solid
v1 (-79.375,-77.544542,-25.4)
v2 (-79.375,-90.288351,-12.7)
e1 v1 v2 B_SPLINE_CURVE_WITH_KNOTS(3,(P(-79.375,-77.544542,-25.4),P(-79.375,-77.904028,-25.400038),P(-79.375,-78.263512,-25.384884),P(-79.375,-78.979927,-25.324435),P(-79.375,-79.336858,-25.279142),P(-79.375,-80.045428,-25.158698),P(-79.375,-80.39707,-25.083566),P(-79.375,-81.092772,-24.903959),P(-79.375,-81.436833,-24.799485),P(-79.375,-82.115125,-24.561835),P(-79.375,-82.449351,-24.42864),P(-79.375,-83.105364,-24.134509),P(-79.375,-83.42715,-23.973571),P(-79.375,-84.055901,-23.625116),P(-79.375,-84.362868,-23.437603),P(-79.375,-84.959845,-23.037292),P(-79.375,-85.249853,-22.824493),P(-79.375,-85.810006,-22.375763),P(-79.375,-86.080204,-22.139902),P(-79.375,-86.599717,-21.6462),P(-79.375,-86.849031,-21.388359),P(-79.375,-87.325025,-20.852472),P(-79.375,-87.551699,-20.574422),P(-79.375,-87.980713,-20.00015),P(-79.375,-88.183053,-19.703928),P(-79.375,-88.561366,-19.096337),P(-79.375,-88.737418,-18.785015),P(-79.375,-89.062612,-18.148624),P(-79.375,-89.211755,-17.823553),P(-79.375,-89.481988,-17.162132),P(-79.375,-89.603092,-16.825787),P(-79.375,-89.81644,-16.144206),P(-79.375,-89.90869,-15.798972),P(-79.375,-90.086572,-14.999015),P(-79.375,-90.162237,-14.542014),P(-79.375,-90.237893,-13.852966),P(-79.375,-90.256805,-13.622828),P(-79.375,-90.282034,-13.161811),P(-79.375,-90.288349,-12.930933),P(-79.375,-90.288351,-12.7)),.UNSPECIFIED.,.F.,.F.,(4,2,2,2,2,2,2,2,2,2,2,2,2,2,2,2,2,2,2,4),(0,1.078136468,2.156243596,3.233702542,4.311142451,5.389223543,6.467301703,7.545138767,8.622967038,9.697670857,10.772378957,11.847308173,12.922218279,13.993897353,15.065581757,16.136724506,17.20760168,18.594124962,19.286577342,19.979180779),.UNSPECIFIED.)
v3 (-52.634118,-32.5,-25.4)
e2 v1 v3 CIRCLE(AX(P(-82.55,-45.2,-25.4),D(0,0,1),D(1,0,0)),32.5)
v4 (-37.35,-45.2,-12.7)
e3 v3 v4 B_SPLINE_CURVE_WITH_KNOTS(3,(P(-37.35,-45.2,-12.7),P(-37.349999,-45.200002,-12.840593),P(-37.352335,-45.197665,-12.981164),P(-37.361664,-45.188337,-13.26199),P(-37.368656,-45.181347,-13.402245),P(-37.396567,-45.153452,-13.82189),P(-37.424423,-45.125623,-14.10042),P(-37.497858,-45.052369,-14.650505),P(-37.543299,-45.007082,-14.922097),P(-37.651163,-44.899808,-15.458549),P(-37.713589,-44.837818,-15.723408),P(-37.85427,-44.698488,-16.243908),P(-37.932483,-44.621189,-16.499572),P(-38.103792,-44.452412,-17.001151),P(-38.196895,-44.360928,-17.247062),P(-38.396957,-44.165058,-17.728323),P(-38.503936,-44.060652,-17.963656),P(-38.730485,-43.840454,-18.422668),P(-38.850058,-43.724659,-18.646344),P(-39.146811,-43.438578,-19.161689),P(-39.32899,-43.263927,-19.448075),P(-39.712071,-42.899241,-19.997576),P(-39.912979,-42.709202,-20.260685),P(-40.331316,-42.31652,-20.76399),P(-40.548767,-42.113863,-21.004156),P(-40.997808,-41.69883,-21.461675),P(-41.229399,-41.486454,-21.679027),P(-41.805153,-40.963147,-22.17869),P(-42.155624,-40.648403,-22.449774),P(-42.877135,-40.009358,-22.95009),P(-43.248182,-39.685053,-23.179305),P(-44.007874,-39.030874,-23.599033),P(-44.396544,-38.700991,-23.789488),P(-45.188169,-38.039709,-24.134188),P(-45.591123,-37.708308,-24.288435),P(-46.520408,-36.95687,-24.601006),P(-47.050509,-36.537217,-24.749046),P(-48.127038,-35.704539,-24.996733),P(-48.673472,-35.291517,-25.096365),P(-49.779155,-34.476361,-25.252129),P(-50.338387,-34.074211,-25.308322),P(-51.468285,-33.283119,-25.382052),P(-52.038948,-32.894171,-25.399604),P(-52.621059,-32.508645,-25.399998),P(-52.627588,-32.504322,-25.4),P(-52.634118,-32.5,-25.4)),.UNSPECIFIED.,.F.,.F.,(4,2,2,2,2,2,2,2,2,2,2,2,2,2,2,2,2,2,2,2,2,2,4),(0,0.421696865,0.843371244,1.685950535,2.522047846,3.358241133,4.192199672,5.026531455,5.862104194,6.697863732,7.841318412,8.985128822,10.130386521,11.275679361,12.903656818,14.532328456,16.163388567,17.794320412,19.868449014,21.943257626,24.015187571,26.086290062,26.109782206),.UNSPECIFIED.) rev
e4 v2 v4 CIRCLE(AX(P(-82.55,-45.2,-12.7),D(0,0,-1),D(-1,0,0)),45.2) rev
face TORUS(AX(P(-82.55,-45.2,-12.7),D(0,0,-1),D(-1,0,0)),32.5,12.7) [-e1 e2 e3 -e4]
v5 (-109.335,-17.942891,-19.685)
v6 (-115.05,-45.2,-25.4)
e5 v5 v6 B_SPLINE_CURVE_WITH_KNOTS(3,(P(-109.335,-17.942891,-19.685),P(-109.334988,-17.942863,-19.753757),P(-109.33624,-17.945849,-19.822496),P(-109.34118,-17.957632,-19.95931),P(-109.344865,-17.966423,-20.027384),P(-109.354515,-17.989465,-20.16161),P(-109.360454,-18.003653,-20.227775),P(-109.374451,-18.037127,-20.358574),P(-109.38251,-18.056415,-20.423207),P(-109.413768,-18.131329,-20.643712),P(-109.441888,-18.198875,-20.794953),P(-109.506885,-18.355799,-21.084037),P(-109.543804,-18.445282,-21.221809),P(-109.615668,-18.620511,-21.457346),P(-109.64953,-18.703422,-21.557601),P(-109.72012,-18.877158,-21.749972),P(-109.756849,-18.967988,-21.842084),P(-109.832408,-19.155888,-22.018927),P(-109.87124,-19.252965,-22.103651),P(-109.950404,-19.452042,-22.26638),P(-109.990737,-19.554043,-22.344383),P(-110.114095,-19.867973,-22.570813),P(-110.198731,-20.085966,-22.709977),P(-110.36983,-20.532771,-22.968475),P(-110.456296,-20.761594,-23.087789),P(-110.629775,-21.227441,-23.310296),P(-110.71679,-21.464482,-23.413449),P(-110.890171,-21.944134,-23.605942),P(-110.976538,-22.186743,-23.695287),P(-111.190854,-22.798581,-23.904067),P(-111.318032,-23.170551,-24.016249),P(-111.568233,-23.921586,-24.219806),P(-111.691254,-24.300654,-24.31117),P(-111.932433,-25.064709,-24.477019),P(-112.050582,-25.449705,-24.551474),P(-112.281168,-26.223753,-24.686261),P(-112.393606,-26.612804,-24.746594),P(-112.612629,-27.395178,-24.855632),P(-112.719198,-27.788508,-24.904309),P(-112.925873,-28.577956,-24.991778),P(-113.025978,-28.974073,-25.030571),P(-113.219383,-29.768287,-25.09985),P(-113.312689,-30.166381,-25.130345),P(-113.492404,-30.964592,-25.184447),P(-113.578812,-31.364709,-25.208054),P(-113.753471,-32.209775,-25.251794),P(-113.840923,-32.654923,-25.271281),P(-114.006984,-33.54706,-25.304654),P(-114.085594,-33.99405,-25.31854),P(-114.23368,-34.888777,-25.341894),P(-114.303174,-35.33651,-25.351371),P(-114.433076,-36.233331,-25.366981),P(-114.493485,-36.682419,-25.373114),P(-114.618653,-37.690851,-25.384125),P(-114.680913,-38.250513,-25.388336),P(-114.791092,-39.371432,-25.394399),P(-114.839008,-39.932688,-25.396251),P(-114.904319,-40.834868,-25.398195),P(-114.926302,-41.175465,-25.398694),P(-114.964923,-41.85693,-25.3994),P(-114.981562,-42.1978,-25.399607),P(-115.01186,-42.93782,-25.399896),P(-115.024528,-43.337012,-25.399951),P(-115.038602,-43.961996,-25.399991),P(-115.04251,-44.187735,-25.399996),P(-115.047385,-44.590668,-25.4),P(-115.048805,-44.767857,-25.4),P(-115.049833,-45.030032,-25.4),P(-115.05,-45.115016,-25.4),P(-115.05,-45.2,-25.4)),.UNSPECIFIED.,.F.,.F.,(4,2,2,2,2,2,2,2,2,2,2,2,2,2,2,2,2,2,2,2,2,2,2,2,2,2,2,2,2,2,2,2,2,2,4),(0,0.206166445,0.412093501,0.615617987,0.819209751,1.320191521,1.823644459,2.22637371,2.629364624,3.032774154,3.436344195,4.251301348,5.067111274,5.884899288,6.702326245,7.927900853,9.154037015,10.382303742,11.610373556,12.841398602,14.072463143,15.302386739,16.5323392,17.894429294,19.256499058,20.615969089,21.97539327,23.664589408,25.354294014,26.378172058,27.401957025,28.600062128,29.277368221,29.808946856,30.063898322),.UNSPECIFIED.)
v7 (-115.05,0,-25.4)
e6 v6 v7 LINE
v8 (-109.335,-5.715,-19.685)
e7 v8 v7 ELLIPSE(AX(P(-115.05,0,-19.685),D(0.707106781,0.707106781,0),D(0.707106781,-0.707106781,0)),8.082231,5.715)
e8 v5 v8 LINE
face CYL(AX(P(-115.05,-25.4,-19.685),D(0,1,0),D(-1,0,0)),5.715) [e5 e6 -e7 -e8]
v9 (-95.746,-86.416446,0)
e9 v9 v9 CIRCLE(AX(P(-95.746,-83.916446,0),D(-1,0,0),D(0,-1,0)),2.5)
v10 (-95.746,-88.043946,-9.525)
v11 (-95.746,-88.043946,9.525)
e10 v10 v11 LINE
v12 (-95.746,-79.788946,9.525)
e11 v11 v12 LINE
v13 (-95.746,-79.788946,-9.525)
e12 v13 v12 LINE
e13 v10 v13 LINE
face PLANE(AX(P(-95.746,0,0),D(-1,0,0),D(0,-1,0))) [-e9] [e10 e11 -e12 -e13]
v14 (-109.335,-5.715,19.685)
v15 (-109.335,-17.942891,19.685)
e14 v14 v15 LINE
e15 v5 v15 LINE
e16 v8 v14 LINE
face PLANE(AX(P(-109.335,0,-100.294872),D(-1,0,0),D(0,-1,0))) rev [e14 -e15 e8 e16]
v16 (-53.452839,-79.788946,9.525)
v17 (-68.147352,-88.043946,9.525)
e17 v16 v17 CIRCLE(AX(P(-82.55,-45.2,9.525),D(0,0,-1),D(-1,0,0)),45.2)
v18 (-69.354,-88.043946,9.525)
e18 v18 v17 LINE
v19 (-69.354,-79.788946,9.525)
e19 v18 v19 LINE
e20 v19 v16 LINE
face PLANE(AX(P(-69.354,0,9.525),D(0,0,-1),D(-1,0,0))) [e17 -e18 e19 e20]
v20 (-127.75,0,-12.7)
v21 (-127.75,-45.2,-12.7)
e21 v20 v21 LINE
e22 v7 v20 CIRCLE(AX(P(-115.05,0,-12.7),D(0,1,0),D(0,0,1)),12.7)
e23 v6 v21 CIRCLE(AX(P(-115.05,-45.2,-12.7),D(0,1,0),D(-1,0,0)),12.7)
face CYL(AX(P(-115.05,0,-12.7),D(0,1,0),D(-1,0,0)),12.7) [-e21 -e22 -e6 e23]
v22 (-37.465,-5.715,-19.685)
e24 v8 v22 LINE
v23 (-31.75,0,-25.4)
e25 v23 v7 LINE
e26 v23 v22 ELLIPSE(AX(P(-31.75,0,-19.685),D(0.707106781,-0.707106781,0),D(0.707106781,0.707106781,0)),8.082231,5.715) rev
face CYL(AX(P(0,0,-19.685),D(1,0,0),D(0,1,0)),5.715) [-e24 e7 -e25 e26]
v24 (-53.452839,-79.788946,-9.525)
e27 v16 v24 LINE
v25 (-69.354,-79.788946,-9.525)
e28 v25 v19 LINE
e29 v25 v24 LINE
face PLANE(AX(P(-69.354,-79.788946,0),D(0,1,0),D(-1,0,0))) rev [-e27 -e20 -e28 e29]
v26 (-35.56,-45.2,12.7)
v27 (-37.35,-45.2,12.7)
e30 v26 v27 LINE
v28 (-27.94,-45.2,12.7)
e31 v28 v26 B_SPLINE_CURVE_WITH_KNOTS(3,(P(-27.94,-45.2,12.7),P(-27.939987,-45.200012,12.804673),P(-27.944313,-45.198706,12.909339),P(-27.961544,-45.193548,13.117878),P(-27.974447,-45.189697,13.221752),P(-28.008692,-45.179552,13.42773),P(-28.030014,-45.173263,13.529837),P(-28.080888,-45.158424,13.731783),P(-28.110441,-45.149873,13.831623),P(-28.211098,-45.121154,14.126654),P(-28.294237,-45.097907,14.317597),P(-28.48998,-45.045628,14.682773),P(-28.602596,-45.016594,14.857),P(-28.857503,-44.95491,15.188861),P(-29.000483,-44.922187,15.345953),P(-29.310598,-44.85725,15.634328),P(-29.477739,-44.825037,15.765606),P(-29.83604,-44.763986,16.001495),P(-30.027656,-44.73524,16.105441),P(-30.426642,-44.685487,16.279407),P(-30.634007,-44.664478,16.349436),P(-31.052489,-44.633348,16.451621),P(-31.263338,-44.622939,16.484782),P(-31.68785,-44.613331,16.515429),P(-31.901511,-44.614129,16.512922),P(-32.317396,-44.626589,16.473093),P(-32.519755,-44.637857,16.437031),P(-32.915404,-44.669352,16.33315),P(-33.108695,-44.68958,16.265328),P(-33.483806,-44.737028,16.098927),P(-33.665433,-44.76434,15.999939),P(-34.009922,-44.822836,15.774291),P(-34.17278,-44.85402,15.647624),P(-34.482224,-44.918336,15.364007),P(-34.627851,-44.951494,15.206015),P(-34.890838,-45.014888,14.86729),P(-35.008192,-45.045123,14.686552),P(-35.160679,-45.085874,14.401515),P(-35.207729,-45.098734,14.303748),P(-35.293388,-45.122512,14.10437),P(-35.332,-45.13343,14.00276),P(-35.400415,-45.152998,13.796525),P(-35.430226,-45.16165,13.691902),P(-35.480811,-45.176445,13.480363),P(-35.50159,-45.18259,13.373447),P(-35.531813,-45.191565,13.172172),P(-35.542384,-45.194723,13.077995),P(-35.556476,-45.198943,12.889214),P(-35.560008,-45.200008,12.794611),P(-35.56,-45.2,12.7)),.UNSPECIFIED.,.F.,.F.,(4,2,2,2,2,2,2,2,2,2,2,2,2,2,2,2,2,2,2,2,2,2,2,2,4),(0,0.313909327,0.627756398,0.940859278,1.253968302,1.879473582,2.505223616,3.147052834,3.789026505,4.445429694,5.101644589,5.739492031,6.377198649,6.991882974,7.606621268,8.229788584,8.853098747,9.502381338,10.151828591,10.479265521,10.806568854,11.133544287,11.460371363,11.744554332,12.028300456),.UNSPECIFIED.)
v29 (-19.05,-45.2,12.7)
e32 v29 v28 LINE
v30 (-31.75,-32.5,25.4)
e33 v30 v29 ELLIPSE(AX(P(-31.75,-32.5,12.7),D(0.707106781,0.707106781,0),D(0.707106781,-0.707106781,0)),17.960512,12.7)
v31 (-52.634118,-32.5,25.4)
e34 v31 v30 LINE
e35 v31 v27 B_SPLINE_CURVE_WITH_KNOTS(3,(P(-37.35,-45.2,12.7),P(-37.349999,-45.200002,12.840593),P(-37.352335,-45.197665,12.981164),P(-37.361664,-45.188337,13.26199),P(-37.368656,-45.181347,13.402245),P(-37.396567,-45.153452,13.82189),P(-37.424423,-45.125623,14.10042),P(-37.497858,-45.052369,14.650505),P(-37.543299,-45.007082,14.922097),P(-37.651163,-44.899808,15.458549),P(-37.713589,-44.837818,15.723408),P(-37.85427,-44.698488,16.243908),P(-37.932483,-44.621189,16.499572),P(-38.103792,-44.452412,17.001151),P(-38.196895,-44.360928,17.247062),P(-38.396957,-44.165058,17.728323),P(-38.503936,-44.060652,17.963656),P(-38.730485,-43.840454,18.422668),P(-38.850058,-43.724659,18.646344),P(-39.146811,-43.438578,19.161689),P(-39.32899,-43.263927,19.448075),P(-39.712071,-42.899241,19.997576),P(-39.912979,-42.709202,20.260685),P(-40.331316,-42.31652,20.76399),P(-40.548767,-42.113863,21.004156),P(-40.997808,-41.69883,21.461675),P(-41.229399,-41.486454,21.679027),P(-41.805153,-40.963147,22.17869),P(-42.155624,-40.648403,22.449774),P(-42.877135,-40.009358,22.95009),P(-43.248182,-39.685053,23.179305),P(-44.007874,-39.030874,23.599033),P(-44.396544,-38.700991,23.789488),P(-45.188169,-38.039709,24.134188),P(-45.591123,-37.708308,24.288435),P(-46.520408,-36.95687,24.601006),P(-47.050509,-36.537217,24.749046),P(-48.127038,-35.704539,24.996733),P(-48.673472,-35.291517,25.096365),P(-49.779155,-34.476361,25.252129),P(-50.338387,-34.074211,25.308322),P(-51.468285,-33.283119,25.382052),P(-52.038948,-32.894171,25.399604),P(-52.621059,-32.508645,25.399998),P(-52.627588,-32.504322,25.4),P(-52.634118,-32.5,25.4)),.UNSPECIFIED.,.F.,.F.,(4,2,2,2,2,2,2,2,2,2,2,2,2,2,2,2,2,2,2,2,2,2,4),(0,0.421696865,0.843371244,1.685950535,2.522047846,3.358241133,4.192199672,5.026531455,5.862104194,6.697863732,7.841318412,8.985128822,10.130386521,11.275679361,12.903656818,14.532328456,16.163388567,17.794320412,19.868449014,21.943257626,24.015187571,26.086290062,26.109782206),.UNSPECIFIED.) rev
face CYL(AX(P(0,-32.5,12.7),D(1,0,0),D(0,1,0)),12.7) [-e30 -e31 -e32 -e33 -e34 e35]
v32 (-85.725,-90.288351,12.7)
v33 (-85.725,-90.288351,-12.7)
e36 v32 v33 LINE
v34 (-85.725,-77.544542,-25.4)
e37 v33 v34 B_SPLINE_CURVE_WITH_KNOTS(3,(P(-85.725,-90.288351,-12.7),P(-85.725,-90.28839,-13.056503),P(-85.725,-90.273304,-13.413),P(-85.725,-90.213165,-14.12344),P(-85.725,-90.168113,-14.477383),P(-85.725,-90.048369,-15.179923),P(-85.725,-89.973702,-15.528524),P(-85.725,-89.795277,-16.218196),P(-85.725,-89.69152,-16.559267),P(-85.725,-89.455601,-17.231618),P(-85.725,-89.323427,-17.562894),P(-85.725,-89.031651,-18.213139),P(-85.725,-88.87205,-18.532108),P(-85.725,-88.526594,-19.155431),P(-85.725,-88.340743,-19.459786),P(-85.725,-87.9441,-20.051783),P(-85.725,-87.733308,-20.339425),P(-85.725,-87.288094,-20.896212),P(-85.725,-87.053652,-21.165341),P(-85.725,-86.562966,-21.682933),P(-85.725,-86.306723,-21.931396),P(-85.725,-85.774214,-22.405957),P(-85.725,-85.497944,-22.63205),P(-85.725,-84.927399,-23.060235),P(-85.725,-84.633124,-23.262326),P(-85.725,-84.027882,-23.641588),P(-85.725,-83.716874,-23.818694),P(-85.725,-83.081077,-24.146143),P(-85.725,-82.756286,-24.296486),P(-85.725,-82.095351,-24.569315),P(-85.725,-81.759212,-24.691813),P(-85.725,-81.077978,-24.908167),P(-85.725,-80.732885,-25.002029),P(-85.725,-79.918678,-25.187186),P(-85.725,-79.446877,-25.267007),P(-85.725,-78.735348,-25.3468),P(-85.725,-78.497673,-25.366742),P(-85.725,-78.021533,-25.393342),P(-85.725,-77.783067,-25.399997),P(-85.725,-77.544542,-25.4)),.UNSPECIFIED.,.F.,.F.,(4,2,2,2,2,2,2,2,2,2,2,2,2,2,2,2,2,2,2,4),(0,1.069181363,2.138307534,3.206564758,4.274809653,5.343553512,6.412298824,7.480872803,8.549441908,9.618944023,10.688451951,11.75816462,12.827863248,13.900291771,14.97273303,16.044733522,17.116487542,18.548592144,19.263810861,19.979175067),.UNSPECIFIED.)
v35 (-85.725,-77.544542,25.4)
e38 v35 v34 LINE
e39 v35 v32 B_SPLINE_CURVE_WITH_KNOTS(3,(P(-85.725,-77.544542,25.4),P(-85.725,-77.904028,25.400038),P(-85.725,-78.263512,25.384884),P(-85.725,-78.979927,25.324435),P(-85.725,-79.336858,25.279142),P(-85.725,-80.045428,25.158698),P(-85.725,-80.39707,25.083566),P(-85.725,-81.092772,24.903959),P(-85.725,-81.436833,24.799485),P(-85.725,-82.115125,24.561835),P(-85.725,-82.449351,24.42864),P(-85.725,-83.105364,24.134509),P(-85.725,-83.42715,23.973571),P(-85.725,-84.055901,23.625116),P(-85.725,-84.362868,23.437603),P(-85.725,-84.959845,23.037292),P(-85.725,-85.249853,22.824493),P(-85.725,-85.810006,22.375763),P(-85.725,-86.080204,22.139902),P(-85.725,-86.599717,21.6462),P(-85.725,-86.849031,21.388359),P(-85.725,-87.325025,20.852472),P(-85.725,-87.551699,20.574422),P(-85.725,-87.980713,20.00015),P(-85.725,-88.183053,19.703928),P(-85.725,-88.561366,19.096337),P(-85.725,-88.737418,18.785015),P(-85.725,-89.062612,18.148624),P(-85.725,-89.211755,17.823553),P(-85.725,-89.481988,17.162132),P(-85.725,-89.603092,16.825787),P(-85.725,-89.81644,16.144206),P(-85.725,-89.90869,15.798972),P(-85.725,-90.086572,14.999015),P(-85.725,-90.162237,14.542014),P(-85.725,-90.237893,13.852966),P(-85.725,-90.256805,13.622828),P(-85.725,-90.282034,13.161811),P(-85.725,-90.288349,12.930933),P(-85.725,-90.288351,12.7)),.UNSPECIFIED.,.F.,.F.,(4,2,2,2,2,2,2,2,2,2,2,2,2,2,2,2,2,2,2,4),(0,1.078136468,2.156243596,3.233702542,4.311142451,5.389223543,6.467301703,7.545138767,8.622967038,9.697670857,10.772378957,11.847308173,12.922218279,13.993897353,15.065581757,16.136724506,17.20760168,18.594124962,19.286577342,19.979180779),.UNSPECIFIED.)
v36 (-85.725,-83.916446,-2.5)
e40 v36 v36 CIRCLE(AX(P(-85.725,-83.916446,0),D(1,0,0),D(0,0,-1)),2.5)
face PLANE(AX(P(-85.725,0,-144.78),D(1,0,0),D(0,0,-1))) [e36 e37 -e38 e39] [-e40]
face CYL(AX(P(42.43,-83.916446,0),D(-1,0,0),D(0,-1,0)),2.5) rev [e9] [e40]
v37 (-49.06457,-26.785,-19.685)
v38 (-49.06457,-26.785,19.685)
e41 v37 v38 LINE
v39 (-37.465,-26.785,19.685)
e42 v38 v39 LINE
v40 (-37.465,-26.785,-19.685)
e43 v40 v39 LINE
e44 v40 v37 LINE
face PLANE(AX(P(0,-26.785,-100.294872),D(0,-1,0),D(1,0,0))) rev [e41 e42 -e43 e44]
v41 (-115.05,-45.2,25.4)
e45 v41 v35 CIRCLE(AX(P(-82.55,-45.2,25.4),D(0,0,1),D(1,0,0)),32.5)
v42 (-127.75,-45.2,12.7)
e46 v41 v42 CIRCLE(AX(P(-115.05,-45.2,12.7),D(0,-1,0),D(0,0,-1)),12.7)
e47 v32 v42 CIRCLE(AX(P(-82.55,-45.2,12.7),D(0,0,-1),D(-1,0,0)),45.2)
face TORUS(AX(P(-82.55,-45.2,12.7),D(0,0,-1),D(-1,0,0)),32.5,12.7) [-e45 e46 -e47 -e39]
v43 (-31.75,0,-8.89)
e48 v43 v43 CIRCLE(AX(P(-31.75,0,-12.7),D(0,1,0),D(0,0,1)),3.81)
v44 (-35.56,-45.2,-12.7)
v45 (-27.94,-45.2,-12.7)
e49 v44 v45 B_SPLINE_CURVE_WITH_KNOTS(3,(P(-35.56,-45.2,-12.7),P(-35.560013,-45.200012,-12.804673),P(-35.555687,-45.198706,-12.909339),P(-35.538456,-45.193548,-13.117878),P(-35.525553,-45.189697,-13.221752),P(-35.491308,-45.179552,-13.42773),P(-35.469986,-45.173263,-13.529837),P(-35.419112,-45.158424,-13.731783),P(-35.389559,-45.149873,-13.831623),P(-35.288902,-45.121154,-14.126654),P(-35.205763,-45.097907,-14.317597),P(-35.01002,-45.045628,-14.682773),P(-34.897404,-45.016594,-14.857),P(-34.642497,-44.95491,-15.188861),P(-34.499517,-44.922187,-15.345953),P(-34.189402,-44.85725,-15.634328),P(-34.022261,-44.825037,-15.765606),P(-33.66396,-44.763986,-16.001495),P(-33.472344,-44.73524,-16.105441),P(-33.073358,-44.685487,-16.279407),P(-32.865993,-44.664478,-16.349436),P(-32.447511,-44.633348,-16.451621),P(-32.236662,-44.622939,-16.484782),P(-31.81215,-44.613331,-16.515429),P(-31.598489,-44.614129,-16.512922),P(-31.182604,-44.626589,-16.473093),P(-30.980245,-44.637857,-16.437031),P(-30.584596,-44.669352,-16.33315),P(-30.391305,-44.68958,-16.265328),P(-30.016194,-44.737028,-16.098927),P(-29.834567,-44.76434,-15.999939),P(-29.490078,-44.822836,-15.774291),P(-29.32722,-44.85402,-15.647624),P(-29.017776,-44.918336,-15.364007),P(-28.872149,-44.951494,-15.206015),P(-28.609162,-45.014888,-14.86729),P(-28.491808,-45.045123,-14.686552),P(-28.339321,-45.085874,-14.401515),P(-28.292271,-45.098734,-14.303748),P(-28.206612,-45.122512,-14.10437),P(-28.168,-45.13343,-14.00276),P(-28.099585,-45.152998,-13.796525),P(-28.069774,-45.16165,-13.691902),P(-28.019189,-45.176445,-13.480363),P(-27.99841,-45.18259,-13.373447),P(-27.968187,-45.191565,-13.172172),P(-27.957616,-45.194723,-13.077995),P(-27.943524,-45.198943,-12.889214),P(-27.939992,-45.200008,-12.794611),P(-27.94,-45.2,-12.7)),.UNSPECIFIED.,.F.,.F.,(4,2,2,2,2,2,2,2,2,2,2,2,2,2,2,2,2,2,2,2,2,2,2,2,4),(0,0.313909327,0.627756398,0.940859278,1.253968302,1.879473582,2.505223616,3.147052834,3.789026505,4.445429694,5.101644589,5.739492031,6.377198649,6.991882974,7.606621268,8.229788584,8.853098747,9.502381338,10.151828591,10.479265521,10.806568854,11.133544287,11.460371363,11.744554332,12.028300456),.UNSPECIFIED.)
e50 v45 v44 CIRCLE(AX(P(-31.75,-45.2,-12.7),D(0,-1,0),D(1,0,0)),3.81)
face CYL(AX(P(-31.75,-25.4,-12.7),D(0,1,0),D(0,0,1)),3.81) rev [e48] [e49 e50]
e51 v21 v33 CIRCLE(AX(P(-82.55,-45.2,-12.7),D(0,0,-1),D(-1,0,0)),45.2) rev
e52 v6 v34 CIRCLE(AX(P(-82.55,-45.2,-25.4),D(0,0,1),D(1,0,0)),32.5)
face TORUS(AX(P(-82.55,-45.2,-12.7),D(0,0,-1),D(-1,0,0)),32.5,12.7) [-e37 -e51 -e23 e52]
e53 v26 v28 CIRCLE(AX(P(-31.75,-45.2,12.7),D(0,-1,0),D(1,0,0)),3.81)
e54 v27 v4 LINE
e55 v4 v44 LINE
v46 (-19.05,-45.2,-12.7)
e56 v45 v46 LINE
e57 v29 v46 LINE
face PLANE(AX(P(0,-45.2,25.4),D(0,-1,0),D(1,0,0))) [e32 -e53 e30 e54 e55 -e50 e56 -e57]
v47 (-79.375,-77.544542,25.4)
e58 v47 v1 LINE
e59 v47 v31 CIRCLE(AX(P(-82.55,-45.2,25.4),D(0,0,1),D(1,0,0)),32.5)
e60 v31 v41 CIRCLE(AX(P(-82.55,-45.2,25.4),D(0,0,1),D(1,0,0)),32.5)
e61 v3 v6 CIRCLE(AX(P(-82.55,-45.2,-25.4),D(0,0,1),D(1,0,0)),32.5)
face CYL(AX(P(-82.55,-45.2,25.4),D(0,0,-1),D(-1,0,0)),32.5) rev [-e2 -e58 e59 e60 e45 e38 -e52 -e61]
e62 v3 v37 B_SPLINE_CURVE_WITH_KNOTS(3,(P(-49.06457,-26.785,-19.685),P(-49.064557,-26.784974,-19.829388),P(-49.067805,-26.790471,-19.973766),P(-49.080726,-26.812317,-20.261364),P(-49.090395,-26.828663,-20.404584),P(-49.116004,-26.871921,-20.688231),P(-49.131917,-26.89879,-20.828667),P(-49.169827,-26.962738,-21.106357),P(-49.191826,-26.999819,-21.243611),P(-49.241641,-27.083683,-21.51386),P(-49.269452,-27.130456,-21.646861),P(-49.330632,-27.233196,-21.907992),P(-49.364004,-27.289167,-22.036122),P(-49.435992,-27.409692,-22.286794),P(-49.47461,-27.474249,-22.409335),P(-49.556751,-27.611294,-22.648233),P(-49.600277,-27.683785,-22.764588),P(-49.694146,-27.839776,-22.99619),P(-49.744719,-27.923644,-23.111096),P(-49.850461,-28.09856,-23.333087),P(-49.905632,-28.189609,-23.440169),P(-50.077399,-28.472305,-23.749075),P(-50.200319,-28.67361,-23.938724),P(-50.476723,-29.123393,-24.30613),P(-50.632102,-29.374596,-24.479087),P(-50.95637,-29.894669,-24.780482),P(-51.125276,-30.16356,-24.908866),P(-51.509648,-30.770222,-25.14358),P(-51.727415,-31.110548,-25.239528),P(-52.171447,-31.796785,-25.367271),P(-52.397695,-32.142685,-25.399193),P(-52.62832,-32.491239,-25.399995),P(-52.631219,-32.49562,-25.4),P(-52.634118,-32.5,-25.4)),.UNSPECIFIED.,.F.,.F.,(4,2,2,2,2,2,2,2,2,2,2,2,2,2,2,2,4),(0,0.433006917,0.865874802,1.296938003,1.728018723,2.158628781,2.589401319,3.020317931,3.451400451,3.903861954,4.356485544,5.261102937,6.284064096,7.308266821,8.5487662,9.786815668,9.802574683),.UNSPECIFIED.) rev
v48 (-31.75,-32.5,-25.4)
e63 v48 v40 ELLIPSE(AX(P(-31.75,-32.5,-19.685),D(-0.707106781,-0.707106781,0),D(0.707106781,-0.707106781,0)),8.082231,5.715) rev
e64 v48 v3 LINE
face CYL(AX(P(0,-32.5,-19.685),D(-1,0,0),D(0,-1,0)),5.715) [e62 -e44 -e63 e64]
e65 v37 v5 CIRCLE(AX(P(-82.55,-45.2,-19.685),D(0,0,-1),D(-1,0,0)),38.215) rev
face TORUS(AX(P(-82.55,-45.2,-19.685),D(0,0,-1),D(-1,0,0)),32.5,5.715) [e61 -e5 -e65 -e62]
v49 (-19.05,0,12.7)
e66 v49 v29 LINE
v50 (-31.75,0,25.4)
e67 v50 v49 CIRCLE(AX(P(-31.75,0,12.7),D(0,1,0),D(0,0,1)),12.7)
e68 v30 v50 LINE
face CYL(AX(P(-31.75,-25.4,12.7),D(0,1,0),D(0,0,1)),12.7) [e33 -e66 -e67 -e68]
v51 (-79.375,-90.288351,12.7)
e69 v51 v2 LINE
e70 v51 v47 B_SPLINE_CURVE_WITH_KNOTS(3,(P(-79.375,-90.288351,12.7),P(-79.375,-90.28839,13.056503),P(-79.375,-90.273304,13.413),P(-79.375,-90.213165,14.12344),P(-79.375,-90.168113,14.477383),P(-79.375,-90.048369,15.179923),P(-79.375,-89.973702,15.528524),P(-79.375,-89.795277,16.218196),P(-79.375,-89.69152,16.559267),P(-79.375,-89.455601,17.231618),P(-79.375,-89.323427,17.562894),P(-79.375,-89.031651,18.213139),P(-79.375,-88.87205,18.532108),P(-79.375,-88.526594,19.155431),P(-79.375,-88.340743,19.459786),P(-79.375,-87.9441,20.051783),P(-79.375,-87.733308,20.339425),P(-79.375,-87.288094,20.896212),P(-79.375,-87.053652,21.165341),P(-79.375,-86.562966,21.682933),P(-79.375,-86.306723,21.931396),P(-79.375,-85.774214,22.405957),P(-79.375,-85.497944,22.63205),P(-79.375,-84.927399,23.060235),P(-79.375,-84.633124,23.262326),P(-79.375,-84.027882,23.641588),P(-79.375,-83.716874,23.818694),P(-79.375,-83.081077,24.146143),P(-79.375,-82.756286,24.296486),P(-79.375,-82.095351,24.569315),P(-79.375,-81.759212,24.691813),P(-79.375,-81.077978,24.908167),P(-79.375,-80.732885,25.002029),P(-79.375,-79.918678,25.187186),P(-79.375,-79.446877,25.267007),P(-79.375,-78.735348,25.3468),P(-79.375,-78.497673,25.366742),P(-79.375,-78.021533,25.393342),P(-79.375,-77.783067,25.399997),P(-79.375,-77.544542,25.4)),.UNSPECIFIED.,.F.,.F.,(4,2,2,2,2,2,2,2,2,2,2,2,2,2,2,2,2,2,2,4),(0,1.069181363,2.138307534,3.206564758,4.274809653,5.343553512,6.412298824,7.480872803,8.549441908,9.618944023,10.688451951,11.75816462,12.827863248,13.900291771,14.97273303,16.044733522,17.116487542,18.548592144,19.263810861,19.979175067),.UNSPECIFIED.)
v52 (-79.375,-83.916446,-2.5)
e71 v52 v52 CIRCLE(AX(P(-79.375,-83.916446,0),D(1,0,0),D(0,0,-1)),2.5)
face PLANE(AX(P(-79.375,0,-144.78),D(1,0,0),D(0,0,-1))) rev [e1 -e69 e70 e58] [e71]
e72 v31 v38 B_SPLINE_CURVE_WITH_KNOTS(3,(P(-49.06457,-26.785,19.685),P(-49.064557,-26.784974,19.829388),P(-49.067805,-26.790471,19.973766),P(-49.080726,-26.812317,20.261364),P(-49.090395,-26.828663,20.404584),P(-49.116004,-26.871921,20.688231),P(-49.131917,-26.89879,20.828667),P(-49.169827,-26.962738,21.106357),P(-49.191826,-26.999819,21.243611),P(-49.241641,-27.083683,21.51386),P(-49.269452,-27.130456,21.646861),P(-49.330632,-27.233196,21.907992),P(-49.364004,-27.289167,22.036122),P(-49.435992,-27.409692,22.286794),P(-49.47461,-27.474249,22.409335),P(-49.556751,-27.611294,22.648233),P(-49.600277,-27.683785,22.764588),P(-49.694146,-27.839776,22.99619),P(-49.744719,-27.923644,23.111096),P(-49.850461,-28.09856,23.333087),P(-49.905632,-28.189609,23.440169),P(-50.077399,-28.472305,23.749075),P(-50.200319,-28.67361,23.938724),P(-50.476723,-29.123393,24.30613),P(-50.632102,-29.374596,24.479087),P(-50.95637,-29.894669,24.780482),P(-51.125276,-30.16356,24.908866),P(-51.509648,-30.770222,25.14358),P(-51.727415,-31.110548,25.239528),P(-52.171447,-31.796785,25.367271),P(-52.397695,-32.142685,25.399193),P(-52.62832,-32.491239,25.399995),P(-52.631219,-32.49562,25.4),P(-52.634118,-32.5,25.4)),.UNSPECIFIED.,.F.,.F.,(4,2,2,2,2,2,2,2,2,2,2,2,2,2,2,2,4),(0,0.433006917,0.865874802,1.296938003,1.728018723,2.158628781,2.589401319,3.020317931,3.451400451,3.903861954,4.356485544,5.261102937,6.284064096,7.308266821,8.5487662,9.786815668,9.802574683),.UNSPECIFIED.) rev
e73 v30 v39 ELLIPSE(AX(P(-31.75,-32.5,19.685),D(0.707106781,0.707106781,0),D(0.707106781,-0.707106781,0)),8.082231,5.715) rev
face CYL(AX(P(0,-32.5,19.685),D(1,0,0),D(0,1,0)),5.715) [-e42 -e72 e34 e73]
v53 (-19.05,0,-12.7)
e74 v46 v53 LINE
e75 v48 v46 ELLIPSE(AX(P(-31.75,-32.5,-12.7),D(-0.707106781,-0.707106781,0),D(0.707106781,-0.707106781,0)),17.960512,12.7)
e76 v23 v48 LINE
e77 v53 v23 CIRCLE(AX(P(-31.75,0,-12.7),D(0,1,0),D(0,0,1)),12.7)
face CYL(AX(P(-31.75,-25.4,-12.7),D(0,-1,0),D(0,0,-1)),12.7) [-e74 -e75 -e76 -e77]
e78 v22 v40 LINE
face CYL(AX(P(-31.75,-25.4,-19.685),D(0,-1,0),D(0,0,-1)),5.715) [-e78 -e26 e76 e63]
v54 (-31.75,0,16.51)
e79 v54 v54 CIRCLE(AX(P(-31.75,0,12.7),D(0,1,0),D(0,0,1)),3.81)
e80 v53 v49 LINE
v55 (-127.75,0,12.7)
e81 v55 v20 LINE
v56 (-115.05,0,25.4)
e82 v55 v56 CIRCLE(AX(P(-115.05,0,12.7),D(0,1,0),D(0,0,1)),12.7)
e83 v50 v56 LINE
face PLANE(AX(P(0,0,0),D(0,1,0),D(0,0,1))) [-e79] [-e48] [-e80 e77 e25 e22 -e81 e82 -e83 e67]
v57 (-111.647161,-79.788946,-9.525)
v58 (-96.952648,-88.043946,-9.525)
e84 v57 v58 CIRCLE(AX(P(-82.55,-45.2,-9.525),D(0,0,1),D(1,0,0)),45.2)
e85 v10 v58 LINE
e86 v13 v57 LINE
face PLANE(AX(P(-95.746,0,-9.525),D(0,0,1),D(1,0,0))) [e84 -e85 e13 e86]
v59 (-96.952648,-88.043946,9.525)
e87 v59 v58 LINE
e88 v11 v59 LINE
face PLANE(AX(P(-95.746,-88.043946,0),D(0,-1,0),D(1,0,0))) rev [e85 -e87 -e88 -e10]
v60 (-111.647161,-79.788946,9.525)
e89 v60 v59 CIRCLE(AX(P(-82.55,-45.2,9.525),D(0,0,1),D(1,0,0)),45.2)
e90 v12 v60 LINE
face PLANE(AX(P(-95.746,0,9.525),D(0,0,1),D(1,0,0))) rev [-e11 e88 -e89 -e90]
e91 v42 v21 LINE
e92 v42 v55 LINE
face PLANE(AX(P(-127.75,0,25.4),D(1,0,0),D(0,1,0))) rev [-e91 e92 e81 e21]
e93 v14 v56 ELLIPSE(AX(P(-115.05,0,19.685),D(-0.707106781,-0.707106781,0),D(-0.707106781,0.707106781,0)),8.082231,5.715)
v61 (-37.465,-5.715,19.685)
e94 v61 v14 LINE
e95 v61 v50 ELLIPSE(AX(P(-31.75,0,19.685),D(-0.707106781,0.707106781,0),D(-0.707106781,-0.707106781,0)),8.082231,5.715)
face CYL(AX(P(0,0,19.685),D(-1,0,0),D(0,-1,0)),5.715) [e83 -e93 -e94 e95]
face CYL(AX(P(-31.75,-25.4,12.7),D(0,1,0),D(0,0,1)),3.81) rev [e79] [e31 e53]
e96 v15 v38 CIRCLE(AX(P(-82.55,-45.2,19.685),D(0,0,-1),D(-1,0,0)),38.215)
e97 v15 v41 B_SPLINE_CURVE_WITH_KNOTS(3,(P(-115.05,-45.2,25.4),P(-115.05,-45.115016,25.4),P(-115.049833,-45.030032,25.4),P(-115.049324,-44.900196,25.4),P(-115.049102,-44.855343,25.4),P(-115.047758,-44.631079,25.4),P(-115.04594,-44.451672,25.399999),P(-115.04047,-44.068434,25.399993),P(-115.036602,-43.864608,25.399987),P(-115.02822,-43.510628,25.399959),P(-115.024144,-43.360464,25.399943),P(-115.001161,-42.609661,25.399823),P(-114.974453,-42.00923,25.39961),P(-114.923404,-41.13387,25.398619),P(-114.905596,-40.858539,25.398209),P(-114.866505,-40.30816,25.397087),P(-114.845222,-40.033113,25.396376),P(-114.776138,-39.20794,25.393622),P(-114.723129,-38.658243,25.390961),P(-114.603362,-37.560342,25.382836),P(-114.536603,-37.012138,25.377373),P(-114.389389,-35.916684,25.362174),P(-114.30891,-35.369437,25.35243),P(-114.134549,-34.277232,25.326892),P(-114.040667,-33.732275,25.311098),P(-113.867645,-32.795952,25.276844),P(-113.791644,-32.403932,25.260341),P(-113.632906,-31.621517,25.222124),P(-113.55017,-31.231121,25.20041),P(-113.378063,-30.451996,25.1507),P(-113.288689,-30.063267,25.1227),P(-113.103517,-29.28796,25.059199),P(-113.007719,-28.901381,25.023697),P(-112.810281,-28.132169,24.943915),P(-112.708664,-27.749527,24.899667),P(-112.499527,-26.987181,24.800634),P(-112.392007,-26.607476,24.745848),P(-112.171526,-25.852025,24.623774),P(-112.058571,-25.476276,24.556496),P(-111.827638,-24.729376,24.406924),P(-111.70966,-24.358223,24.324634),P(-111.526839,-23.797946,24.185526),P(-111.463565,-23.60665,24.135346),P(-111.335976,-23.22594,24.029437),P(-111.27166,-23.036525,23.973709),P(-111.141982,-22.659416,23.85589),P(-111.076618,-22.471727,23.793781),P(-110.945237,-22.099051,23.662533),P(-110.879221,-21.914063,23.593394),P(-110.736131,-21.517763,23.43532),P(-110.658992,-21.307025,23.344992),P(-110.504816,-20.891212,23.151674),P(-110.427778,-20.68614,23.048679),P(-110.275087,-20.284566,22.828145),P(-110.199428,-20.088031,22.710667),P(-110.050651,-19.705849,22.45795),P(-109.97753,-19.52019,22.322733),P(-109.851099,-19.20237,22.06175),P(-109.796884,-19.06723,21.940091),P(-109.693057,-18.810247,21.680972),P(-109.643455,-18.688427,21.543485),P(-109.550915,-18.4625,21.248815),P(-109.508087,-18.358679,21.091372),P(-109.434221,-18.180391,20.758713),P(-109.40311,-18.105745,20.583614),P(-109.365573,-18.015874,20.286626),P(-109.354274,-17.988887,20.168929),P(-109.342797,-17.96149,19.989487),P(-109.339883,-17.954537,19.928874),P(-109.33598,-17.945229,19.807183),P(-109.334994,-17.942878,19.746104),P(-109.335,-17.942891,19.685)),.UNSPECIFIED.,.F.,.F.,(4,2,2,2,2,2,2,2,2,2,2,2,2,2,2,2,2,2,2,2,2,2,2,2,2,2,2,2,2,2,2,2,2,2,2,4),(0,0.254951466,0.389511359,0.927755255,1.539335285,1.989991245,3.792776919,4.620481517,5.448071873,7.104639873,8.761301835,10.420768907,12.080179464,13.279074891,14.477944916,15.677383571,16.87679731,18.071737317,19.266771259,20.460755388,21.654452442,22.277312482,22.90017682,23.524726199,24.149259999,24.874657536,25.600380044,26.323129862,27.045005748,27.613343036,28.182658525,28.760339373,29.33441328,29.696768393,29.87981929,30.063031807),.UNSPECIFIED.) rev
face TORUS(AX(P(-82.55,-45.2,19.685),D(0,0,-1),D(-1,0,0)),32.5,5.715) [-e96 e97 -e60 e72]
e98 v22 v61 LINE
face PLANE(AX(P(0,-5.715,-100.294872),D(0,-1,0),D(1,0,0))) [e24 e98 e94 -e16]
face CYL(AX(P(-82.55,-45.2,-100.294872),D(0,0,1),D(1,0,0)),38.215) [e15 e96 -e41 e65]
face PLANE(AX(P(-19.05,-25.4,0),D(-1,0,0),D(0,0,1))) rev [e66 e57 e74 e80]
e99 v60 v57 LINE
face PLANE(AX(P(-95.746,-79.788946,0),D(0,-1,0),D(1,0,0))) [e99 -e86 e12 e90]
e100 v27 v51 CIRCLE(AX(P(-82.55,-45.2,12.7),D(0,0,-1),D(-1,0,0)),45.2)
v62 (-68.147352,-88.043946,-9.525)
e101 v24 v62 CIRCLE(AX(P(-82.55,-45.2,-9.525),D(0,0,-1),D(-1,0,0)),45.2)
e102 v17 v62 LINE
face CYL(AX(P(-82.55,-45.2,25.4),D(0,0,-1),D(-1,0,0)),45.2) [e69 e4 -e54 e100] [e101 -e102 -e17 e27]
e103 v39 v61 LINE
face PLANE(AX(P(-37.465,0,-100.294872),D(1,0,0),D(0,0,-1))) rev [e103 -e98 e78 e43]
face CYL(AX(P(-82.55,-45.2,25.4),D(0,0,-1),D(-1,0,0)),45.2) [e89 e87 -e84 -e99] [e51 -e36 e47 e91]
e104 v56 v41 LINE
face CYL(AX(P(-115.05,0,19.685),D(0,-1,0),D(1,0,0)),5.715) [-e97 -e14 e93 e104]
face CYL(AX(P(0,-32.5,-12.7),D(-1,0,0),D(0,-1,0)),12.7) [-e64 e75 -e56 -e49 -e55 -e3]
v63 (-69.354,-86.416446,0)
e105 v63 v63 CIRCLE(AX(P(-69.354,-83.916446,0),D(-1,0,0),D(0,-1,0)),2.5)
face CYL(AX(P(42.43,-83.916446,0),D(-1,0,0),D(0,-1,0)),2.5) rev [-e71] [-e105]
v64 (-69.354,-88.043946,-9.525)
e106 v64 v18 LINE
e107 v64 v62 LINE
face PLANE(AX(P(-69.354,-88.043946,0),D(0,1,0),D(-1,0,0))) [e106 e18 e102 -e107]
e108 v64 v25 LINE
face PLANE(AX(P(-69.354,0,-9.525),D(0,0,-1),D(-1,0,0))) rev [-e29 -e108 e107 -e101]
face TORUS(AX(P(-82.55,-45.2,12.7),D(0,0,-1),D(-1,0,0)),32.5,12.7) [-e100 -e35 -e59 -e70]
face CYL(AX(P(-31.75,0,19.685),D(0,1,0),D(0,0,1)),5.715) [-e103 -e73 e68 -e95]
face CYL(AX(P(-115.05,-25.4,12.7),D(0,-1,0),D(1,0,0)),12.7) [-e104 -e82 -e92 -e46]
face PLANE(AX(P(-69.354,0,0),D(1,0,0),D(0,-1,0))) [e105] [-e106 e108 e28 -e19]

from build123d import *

# Parameters (mm, degrees)
SKETCH2_W           = 25.4
SKETCH2_H           = 50.8
SKETCH2_R           = 3.81
BOSS_EXTRUDE1_DEPTH = 25.4
BOSS_EXTRUDE2_DEPTH = 25.4
CUT_EXTRUDE1_DEPTH  = 170.18
CUT_EXTRUDE2_DEPTH  = 170.18
SKETCH5_3_W         = 19.05
SKETCH5_3_H         = 8.255
SKETCH5_3_R         = 2.5
CUT_EXTRUDE3_DEPTH  = 32.004
SKETCH6_R           = 3.81
CUT_EXTRUDE4_DEPTH  = 32.004
FILLET1_R           = 12.7
CUT_EXTRUDE6_DEPTH  = 50.8
FILLET2_R           = 5.715


# Some blends are built 0.0001 mm under size
with BuildPart() as part:
    # Sketch2 → Boss-Extrude1 (new body)
    with BuildSketch(Plane(origin=(0, 0, 0), x_dir=(1, 0, 0), z_dir=(0, 1, 0))):
        with Locations((-31.75, 0)):
            Rectangle(SKETCH2_W, SKETCH2_H)
        with Locations(Location((-31.75, -12.7, 0), (0, 0, 270))):
            Circle(SKETCH2_R, mode=Mode.SUBTRACT)
        with Locations(Location((-31.75, 12.7, 0), (0, 0, 270))):
            Circle(SKETCH2_R, mode=Mode.SUBTRACT)
    extrude(amount=-BOSS_EXTRUDE1_DEPTH)

    # Sketch3 → Boss-Extrude2 (add, symmetric)
    with BuildSketch(Plane.XY):
        with BuildLine():
            Line((-44.45, -25.4), (-44.45, 0))
            Line((-44.45, 0), (-127.75, 0))
            Line((-127.75, 0), (-127.75, -45.2))
            Line((-127.75, -45.2), (-115.05, -45.2))
            ThreePointArc((-115.05, -45.2), (-82.55, -12.7), (-50.05, -45.2))
            Line((-50.05, -45.2), (-37.35, -45.2))
            Line((-37.35, -45.2), (-19.05, -45.2))
            Line((-19.05, -45.2), (-19.05, -25.4))
            Line((-19.05, -25.4), (-44.45, -25.4))
        make_face()
        with BuildLine():
            Line((-115.05, -45.2), (-127.75, -45.2))
            ThreePointArc((-127.75, -45.2), (-82.55, -90.4), (-37.35, -45.2))
            Line((-37.35, -45.2), (-50.05, -45.2))
            ThreePointArc((-50.05, -45.2), (-82.55, -77.7), (-115.05, -45.2))
        make_face()
    extrude(amount=BOSS_EXTRUDE2_DEPTH, both=True)

    # Sketch4 → Cut-Extrude1 (cut)
    with BuildSketch(Plane.XY.offset(25.4)):
        with BuildLine():
            Line((-85.725, -90.288350768), (-85.725, -104.566683373))
            Line((-85.725, -104.566683373), (-79.375, -104.566683373))
            Line((-79.375, -104.566683373), (-79.375, -90.288350768))
            ThreePointArc((-79.375, -90.288350768), (-82.55, -90.4), (-85.725, -90.288350768))
        make_face()
        with BuildLine():
            ThreePointArc((-50.05, -45.2), (-104.379595736, -21.122650686), (-85.725, -77.544541657))
            Line((-85.725, -77.544541657), (-85.725, -50.833316627))
            Line((-85.725, -50.833316627), (-79.375, -50.833316627))
            Line((-79.375, -50.833316627), (-79.375, -77.544541657))
            ThreePointArc((-79.375, -77.544541657), (-58.472650686, -67.029595736), (-50.05, -45.2))
        make_face()
        with BuildLine():
            Line((-85.725, -50.833316627), (-85.725, -77.544541657))
            ThreePointArc((-85.725, -77.544541657), (-82.55, -77.7), (-79.375, -77.544541657))
            Line((-79.375, -77.544541657), (-79.375, -50.833316627))
            Line((-79.375, -50.833316627), (-85.725, -50.833316627))
        make_face()
        with BuildLine():
            Line((-85.725, -77.544541657), (-85.725, -90.288350768))
            ThreePointArc((-85.725, -90.288350768), (-82.55, -90.4), (-79.375, -90.288350768))
            Line((-79.375, -90.288350768), (-79.375, -77.544541657))
            ThreePointArc((-79.375, -77.544541657), (-82.55, -77.7), (-85.725, -77.544541657))
        make_face()
    extrude(amount=-CUT_EXTRUDE1_DEPTH, mode=Mode.SUBTRACT)

    # Sketch5 → Cut-Extrude2 (cut)
    with BuildSketch(Plane.ZY.offset(127.75)):
        with BuildLine():
            ThreePointArc((2.5, -83.916446213), (1.767766953, -82.14867926), (0, -81.416446213))
            Line((0, -81.416446213), (0, -86.416446213))
            ThreePointArc((0, -86.416446213), (1.767766953, -85.684213166), (2.5, -83.916446213))
        make_face()
        with BuildLine():
            Line((0, -86.416446213), (0, -81.416446213))
            ThreePointArc((0, -81.416446213), (-2.5, -83.916446213), (0, -86.416446213))
        make_face()
    extrude(amount=-CUT_EXTRUDE2_DEPTH, mode=Mode.SUBTRACT)

    # Sketch5<3> → Cut-Extrude3 (cut)
    with BuildSketch(Plane.ZY.offset(127.75)):
        with Locations((0, -83.916446213)):
            Rectangle(SKETCH5_3_W, SKETCH5_3_H)
        with Locations(Location((0, -83.916446213, 0), (0, 0, 270))):
            Circle(SKETCH5_3_R, mode=Mode.SUBTRACT)
    cut_extrude3 = extrude(amount=-CUT_EXTRUDE3_DEPTH, mode=Mode.SUBTRACT)

    # Mirror1: Cut-Extrude3 across plane
    add(cut_extrude3.mirror(Plane.ZY.offset(82.55)), mode=Mode.SUBTRACT)

    # Sketch6 → Cut-Extrude4 (cut)
    with BuildSketch(Plane(origin=(0, -25.4, 0), x_dir=(1, 0, 0), z_dir=(0, 1, 0))):
        with Locations(Location((-31.75, -12.7, 0), (0, 0, 270))):
            Circle(SKETCH6_R)
        with Locations(Location((-31.75, 12.7, 0), (0, 0, 270))):
            Circle(SKETCH6_R)
    extrude(amount=-CUT_EXTRUDE4_DEPTH, mode=Mode.SUBTRACT)

    # Fillet1
    # the kernel refuses this fillet: 12.7 mm, written as the material it takes off along each edge
    with BuildSketch(Plane(origin=(-82.55, -45.2, 25.4), x_dir=(-1, 0, 0), z_dir=(0, 1, 0))) as fillet1_piece_1:
        with BuildLine():
            CenterArc((45.2 - FILLET1_R, -FILLET1_R), FILLET1_R, 360, 90)
            Line((45.2, -FILLET1_R), (45.2, 0))
            Line((45.2, 0), (45.2 - FILLET1_R, 0))
        make_face()
    revolve(axis=Axis((-82.55, -45.2, 25.4), (0, 0, 1)), revolution_arc=126.233269218, mode=Mode.SUBTRACT)
    with BuildSketch(Plane(origin=(-82.55, -45.2, -25.4), x_dir=(-1, 0, 0), z_dir=(0, 1, 0))) as fillet1_piece_2:
        with BuildLine():
            CenterArc((45.2 - FILLET1_R, FILLET1_R), FILLET1_R, 270, 90)
            Line((45.2, FILLET1_R), (45.2, 0))
            Line((45.2, 0), (45.2 - FILLET1_R, 0))
        make_face()
    revolve(axis=Axis((-82.55, -45.2, -25.4), (0, 0, 1)), revolution_arc=126.233269218, mode=Mode.SUBTRACT)
    with BuildSketch(Plane(origin=(-19.05, -76.95, 25.4), x_dir=(-1, 0, 0), z_dir=(0, 1, 0))) as fillet1_piece_3:
        with BuildLine():
            CenterArc((FILLET1_R, -FILLET1_R), FILLET1_R, 90, 90)
            Line((0, -FILLET1_R), (0, 0))
            Line((0, 0), (FILLET1_R, 0))
        make_face()
    extrude(amount=108.7, mode=Mode.SUBTRACT)
    with BuildSketch(Plane(origin=(12.7, -45.2, -25.4), x_dir=(0, 0, 1), z_dir=(-1, 0, 0))) as fillet1_piece_4_section:
        with BuildLine():
            CenterArc((FILLET1_R, FILLET1_R), FILLET1_R, 180, 90)
            Line((0, FILLET1_R), (0, 0))
            Line((0, 0), (FILLET1_R, 0))
        make_face()
    fillet1_piece_4 = extrude(amount=81.8, mode=Mode.PRIVATE)
    fillet1_piece_4 = fillet1_piece_4 - Plane(origin=(-82.55, -45.2, -25.4), x_dir=(-1, 0, 0), z_dir=(0, 0, 1)) * Cylinder(45.2, 215, mode=Mode.PRIVATE)
    add(fillet1_piece_4, mode=Mode.SUBTRACT)
    with BuildSketch(Plane(origin=(-69.1, -45.2, 25.4), x_dir=(0, 1, 0), z_dir=(1, 0, 0))) as fillet1_piece_5_section:
        with BuildLine():
            CenterArc((FILLET1_R, -FILLET1_R), FILLET1_R, 90, 90)
            Line((0, -FILLET1_R), (0, 0))
            Line((0, 0), (FILLET1_R, 0))
        make_face()
    fillet1_piece_5 = extrude(amount=81.8, mode=Mode.PRIVATE)
    fillet1_piece_5 = fillet1_piece_5 - Plane(origin=(-82.55, -45.2, 25.4), x_dir=(-1, 0, 0), z_dir=(0, 0, 1)) * Cylinder(45.2, 215, mode=Mode.PRIVATE)
    add(fillet1_piece_5, mode=Mode.SUBTRACT)
    with BuildSketch(Plane(origin=(-82.55, -45.2, 25.4), x_dir=(-0.5910741355046212, -0.8066172365734969, 0), z_dir=(-0.8066172365734969, 0.5910741355046212, 0))) as fillet1_piece_6:
        with BuildLine():
            CenterArc((45.2 - FILLET1_R, -FILLET1_R), FILLET1_R, 360, 90)
            Line((45.2, -FILLET1_R), (45.2, 0))
            Line((45.2, 0), (45.2 - FILLET1_R, 0))
        make_face()
    revolve(axis=Axis((-82.55, -45.2, 25.4), (0, 0, 1)), revolution_arc=126.233269218, mode=Mode.SUBTRACT)
    with BuildSketch(Plane(origin=(-82.55, -45.2, -25.4), x_dir=(-0.5910741355045994, -0.8066172365735128, 0), z_dir=(-0.8066172365735128, 0.5910741355045994, 0))) as fillet1_piece_7:
        with BuildLine():
            CenterArc((45.2 - FILLET1_R, FILLET1_R), FILLET1_R, 270, 90)
            Line((45.2, FILLET1_R), (45.2, 0))
            Line((45.2, 0), (45.2 - FILLET1_R, 0))
        make_face()
    revolve(axis=Axis((-82.55, -45.2, -25.4), (0, 0, 1)), revolution_arc=126.233269218, mode=Mode.SUBTRACT)
    with BuildSketch(Plane(origin=(-127.75, 31.75, -25.4), x_dir=(1, 0, 0), z_dir=(0, -1, 0))) as fillet1_piece_8:
        with BuildLine():
            CenterArc((FILLET1_R, FILLET1_R), FILLET1_R, 180, 90)
            Line((0, FILLET1_R), (0, 0))
            Line((0, 0), (FILLET1_R, 0))
        make_face()
    extrude(amount=76.95, mode=Mode.SUBTRACT)
    with BuildSketch(Plane(origin=(-127.75, 31.75, 25.4), x_dir=(1, 0, 0), z_dir=(0, -1, 0))) as fillet1_piece_9:
        with BuildLine():
            CenterArc((FILLET1_R, -FILLET1_R), FILLET1_R, 90, 90)
            Line((0, -FILLET1_R), (0, 0))
            Line((0, 0), (FILLET1_R, 0))
        make_face()
    extrude(amount=76.95, mode=Mode.SUBTRACT)
    with BuildSketch(Plane(origin=(-19.05, -76.95, -25.4), x_dir=(-1, 0, 0), z_dir=(0, 1, 0))) as fillet1_piece_10:
        with BuildLine():
            CenterArc((FILLET1_R, FILLET1_R), FILLET1_R, 180, 90)
            Line((0, FILLET1_R), (0, 0))
            Line((0, 0), (FILLET1_R, 0))
        make_face()
    extrude(amount=108.7, mode=Mode.SUBTRACT)
    with BuildSketch(Plane(origin=(-19.05, -45.2, -25.4), x_dir=(0, 0, 1), z_dir=(-1, 0, 0))) as fillet1_piece_11a_section:
        with BuildLine():
            CenterArc((FILLET1_R, FILLET1_R), FILLET1_R, 180, 90)
            Line((0, FILLET1_R), (0, 0))
            Line((0, 0), (FILLET1_R, 0))
        make_face()
    fillet1_piece_11a = extrude(amount=50.05, mode=Mode.PRIVATE)
    fillet1_piece_11a = fillet1_piece_11a & Plane(origin=(-82.55, -45.2, -25.4), x_dir=(-1, 0, 0), z_dir=(0, 0, 1)) * Cylinder(45.2, 151, mode=Mode.PRIVATE)
    fillet1_piece_11a = fillet1_piece_11a - Plane(origin=(-82.55, -45.2, -25.4), x_dir=(-1, 0, 0), z_dir=(0, 0, 1)) * Cylinder(32.5, 151, mode=Mode.PRIVATE)
    with BuildSketch(Plane(origin=(-82.55, -45.2, -25.4), x_dir=(-0.5910741355045994, -0.8066172365735128, 0), z_dir=(-0.8066172365735128, 0.5910741355045994, 0))) as fillet1_piece_11b_section:
        with BuildLine():
            CenterArc((45.2 - FILLET1_R, FILLET1_R), FILLET1_R, 270, 90)
            Line((45.2, FILLET1_R), (45.2, 0))
            Line((45.2, 0), (45.2 - FILLET1_R, 0))
        make_face()
    fillet1_piece_11b = revolve(axis=Axis((-82.55, -45.2, -25.4), (0, 0, 1)), revolution_arc=166.494503726, mode=Mode.PRIVATE)
    fillet1_piece_11b = split(fillet1_piece_11b, bisect_by=Plane(origin=(-82.55, -45.2, -25.4), z_dir=(0, 1, 0)), keep=Keep.TOP, mode=Mode.PRIVATE)
    fillet1_piece_11 = fillet1_piece_11a & fillet1_piece_11b
    add(fillet1_piece_11, mode=Mode.SUBTRACT)
    with BuildSketch(Plane(origin=(-82.55, -45.2, 25.4), x_dir=(-0.5910741355046212, -0.8066172365734969, 0), z_dir=(-0.8066172365734969, 0.5910741355046212, 0))) as fillet1_piece_12a_section:
        with BuildLine():
            CenterArc((45.2 - FILLET1_R, -FILLET1_R), FILLET1_R, 360, 90)
            Line((45.2, -FILLET1_R), (45.2, 0))
            Line((45.2, 0), (45.2 - FILLET1_R, 0))
        make_face()
    fillet1_piece_12a = revolve(axis=Axis((-82.55, -45.2, 25.4), (0, 0, 1)), revolution_arc=166.494503726, mode=Mode.PRIVATE)
    fillet1_piece_12a = split(fillet1_piece_12a, bisect_by=Plane(origin=(-82.55, -45.2, 25.4), z_dir=(0, 1, 0)), keep=Keep.TOP, mode=Mode.PRIVATE)
    with BuildSketch(Plane(origin=(-69.1, -45.2, 25.4), x_dir=(0, 1, 0), z_dir=(1, 0, 0))) as fillet1_piece_12b_section:
        with BuildLine():
            CenterArc((FILLET1_R, -FILLET1_R), FILLET1_R, 90, 90)
            Line((0, -FILLET1_R), (0, 0))
            Line((0, 0), (FILLET1_R, 0))
        make_face()
    fillet1_piece_12b = extrude(amount=50.05, mode=Mode.PRIVATE)
    fillet1_piece_12b = fillet1_piece_12b & Plane(origin=(-82.55, -45.2, 25.4), x_dir=(-1, 0, 0), z_dir=(0, 0, 1)) * Cylinder(45.2, 151, mode=Mode.PRIVATE)
    fillet1_piece_12b = fillet1_piece_12b - Plane(origin=(-82.55, -45.2, 25.4), x_dir=(-1, 0, 0), z_dir=(0, 0, 1)) * Cylinder(32.5, 151, mode=Mode.PRIVATE)
    fillet1_piece_12 = fillet1_piece_12a & fillet1_piece_12b
    add(fillet1_piece_12, mode=Mode.SUBTRACT)

    # Sketch7 → Cut-Extrude6 (cut)
    with BuildSketch(Plane.XY.offset(25.4)):
        with BuildLine():
            Line((-49.064570333, -26.785), (-37.465, -26.785))
            Line((-37.465, -26.785), (-37.465, -5.715))
            Line((-37.465, -5.715), (-109.335, -5.715))
            Line((-109.335, -5.715), (-109.335, -17.942890836))
            ThreePointArc((-109.335, -17.942890836), (-77.002959073, -7.389729412), (-49.064570333, -26.785))
        make_face()
    extrude(amount=-CUT_EXTRUDE6_DEPTH, mode=Mode.SUBTRACT)

    # Fillet2
    fillet2_edges = [part.edges().sort_by_distance(p)[0] for p in [
        (-77.002959073, -7.389729412, -25.4),
        (-73.4, -5.715, -25.4),
        (-43.264785166, -26.785, 25.4),
        (-37.465, -16.25, 25.4),
        (-109.335, -11.828945418, 25.4),
        (-43.264785166, -26.785, -25.4),
        (-37.465, -16.25, -25.4),
        (-73.4, -5.715, 25.4),
        (-109.335, -11.828945418, -25.4),
        (-77.002959073, -7.389729412, 25.4),
    ]]
    fillet(fillet2_edges, radius=FILLET2_R - 0.0001)  # a hair under: the kernel refuses the full size


solid = part.part
